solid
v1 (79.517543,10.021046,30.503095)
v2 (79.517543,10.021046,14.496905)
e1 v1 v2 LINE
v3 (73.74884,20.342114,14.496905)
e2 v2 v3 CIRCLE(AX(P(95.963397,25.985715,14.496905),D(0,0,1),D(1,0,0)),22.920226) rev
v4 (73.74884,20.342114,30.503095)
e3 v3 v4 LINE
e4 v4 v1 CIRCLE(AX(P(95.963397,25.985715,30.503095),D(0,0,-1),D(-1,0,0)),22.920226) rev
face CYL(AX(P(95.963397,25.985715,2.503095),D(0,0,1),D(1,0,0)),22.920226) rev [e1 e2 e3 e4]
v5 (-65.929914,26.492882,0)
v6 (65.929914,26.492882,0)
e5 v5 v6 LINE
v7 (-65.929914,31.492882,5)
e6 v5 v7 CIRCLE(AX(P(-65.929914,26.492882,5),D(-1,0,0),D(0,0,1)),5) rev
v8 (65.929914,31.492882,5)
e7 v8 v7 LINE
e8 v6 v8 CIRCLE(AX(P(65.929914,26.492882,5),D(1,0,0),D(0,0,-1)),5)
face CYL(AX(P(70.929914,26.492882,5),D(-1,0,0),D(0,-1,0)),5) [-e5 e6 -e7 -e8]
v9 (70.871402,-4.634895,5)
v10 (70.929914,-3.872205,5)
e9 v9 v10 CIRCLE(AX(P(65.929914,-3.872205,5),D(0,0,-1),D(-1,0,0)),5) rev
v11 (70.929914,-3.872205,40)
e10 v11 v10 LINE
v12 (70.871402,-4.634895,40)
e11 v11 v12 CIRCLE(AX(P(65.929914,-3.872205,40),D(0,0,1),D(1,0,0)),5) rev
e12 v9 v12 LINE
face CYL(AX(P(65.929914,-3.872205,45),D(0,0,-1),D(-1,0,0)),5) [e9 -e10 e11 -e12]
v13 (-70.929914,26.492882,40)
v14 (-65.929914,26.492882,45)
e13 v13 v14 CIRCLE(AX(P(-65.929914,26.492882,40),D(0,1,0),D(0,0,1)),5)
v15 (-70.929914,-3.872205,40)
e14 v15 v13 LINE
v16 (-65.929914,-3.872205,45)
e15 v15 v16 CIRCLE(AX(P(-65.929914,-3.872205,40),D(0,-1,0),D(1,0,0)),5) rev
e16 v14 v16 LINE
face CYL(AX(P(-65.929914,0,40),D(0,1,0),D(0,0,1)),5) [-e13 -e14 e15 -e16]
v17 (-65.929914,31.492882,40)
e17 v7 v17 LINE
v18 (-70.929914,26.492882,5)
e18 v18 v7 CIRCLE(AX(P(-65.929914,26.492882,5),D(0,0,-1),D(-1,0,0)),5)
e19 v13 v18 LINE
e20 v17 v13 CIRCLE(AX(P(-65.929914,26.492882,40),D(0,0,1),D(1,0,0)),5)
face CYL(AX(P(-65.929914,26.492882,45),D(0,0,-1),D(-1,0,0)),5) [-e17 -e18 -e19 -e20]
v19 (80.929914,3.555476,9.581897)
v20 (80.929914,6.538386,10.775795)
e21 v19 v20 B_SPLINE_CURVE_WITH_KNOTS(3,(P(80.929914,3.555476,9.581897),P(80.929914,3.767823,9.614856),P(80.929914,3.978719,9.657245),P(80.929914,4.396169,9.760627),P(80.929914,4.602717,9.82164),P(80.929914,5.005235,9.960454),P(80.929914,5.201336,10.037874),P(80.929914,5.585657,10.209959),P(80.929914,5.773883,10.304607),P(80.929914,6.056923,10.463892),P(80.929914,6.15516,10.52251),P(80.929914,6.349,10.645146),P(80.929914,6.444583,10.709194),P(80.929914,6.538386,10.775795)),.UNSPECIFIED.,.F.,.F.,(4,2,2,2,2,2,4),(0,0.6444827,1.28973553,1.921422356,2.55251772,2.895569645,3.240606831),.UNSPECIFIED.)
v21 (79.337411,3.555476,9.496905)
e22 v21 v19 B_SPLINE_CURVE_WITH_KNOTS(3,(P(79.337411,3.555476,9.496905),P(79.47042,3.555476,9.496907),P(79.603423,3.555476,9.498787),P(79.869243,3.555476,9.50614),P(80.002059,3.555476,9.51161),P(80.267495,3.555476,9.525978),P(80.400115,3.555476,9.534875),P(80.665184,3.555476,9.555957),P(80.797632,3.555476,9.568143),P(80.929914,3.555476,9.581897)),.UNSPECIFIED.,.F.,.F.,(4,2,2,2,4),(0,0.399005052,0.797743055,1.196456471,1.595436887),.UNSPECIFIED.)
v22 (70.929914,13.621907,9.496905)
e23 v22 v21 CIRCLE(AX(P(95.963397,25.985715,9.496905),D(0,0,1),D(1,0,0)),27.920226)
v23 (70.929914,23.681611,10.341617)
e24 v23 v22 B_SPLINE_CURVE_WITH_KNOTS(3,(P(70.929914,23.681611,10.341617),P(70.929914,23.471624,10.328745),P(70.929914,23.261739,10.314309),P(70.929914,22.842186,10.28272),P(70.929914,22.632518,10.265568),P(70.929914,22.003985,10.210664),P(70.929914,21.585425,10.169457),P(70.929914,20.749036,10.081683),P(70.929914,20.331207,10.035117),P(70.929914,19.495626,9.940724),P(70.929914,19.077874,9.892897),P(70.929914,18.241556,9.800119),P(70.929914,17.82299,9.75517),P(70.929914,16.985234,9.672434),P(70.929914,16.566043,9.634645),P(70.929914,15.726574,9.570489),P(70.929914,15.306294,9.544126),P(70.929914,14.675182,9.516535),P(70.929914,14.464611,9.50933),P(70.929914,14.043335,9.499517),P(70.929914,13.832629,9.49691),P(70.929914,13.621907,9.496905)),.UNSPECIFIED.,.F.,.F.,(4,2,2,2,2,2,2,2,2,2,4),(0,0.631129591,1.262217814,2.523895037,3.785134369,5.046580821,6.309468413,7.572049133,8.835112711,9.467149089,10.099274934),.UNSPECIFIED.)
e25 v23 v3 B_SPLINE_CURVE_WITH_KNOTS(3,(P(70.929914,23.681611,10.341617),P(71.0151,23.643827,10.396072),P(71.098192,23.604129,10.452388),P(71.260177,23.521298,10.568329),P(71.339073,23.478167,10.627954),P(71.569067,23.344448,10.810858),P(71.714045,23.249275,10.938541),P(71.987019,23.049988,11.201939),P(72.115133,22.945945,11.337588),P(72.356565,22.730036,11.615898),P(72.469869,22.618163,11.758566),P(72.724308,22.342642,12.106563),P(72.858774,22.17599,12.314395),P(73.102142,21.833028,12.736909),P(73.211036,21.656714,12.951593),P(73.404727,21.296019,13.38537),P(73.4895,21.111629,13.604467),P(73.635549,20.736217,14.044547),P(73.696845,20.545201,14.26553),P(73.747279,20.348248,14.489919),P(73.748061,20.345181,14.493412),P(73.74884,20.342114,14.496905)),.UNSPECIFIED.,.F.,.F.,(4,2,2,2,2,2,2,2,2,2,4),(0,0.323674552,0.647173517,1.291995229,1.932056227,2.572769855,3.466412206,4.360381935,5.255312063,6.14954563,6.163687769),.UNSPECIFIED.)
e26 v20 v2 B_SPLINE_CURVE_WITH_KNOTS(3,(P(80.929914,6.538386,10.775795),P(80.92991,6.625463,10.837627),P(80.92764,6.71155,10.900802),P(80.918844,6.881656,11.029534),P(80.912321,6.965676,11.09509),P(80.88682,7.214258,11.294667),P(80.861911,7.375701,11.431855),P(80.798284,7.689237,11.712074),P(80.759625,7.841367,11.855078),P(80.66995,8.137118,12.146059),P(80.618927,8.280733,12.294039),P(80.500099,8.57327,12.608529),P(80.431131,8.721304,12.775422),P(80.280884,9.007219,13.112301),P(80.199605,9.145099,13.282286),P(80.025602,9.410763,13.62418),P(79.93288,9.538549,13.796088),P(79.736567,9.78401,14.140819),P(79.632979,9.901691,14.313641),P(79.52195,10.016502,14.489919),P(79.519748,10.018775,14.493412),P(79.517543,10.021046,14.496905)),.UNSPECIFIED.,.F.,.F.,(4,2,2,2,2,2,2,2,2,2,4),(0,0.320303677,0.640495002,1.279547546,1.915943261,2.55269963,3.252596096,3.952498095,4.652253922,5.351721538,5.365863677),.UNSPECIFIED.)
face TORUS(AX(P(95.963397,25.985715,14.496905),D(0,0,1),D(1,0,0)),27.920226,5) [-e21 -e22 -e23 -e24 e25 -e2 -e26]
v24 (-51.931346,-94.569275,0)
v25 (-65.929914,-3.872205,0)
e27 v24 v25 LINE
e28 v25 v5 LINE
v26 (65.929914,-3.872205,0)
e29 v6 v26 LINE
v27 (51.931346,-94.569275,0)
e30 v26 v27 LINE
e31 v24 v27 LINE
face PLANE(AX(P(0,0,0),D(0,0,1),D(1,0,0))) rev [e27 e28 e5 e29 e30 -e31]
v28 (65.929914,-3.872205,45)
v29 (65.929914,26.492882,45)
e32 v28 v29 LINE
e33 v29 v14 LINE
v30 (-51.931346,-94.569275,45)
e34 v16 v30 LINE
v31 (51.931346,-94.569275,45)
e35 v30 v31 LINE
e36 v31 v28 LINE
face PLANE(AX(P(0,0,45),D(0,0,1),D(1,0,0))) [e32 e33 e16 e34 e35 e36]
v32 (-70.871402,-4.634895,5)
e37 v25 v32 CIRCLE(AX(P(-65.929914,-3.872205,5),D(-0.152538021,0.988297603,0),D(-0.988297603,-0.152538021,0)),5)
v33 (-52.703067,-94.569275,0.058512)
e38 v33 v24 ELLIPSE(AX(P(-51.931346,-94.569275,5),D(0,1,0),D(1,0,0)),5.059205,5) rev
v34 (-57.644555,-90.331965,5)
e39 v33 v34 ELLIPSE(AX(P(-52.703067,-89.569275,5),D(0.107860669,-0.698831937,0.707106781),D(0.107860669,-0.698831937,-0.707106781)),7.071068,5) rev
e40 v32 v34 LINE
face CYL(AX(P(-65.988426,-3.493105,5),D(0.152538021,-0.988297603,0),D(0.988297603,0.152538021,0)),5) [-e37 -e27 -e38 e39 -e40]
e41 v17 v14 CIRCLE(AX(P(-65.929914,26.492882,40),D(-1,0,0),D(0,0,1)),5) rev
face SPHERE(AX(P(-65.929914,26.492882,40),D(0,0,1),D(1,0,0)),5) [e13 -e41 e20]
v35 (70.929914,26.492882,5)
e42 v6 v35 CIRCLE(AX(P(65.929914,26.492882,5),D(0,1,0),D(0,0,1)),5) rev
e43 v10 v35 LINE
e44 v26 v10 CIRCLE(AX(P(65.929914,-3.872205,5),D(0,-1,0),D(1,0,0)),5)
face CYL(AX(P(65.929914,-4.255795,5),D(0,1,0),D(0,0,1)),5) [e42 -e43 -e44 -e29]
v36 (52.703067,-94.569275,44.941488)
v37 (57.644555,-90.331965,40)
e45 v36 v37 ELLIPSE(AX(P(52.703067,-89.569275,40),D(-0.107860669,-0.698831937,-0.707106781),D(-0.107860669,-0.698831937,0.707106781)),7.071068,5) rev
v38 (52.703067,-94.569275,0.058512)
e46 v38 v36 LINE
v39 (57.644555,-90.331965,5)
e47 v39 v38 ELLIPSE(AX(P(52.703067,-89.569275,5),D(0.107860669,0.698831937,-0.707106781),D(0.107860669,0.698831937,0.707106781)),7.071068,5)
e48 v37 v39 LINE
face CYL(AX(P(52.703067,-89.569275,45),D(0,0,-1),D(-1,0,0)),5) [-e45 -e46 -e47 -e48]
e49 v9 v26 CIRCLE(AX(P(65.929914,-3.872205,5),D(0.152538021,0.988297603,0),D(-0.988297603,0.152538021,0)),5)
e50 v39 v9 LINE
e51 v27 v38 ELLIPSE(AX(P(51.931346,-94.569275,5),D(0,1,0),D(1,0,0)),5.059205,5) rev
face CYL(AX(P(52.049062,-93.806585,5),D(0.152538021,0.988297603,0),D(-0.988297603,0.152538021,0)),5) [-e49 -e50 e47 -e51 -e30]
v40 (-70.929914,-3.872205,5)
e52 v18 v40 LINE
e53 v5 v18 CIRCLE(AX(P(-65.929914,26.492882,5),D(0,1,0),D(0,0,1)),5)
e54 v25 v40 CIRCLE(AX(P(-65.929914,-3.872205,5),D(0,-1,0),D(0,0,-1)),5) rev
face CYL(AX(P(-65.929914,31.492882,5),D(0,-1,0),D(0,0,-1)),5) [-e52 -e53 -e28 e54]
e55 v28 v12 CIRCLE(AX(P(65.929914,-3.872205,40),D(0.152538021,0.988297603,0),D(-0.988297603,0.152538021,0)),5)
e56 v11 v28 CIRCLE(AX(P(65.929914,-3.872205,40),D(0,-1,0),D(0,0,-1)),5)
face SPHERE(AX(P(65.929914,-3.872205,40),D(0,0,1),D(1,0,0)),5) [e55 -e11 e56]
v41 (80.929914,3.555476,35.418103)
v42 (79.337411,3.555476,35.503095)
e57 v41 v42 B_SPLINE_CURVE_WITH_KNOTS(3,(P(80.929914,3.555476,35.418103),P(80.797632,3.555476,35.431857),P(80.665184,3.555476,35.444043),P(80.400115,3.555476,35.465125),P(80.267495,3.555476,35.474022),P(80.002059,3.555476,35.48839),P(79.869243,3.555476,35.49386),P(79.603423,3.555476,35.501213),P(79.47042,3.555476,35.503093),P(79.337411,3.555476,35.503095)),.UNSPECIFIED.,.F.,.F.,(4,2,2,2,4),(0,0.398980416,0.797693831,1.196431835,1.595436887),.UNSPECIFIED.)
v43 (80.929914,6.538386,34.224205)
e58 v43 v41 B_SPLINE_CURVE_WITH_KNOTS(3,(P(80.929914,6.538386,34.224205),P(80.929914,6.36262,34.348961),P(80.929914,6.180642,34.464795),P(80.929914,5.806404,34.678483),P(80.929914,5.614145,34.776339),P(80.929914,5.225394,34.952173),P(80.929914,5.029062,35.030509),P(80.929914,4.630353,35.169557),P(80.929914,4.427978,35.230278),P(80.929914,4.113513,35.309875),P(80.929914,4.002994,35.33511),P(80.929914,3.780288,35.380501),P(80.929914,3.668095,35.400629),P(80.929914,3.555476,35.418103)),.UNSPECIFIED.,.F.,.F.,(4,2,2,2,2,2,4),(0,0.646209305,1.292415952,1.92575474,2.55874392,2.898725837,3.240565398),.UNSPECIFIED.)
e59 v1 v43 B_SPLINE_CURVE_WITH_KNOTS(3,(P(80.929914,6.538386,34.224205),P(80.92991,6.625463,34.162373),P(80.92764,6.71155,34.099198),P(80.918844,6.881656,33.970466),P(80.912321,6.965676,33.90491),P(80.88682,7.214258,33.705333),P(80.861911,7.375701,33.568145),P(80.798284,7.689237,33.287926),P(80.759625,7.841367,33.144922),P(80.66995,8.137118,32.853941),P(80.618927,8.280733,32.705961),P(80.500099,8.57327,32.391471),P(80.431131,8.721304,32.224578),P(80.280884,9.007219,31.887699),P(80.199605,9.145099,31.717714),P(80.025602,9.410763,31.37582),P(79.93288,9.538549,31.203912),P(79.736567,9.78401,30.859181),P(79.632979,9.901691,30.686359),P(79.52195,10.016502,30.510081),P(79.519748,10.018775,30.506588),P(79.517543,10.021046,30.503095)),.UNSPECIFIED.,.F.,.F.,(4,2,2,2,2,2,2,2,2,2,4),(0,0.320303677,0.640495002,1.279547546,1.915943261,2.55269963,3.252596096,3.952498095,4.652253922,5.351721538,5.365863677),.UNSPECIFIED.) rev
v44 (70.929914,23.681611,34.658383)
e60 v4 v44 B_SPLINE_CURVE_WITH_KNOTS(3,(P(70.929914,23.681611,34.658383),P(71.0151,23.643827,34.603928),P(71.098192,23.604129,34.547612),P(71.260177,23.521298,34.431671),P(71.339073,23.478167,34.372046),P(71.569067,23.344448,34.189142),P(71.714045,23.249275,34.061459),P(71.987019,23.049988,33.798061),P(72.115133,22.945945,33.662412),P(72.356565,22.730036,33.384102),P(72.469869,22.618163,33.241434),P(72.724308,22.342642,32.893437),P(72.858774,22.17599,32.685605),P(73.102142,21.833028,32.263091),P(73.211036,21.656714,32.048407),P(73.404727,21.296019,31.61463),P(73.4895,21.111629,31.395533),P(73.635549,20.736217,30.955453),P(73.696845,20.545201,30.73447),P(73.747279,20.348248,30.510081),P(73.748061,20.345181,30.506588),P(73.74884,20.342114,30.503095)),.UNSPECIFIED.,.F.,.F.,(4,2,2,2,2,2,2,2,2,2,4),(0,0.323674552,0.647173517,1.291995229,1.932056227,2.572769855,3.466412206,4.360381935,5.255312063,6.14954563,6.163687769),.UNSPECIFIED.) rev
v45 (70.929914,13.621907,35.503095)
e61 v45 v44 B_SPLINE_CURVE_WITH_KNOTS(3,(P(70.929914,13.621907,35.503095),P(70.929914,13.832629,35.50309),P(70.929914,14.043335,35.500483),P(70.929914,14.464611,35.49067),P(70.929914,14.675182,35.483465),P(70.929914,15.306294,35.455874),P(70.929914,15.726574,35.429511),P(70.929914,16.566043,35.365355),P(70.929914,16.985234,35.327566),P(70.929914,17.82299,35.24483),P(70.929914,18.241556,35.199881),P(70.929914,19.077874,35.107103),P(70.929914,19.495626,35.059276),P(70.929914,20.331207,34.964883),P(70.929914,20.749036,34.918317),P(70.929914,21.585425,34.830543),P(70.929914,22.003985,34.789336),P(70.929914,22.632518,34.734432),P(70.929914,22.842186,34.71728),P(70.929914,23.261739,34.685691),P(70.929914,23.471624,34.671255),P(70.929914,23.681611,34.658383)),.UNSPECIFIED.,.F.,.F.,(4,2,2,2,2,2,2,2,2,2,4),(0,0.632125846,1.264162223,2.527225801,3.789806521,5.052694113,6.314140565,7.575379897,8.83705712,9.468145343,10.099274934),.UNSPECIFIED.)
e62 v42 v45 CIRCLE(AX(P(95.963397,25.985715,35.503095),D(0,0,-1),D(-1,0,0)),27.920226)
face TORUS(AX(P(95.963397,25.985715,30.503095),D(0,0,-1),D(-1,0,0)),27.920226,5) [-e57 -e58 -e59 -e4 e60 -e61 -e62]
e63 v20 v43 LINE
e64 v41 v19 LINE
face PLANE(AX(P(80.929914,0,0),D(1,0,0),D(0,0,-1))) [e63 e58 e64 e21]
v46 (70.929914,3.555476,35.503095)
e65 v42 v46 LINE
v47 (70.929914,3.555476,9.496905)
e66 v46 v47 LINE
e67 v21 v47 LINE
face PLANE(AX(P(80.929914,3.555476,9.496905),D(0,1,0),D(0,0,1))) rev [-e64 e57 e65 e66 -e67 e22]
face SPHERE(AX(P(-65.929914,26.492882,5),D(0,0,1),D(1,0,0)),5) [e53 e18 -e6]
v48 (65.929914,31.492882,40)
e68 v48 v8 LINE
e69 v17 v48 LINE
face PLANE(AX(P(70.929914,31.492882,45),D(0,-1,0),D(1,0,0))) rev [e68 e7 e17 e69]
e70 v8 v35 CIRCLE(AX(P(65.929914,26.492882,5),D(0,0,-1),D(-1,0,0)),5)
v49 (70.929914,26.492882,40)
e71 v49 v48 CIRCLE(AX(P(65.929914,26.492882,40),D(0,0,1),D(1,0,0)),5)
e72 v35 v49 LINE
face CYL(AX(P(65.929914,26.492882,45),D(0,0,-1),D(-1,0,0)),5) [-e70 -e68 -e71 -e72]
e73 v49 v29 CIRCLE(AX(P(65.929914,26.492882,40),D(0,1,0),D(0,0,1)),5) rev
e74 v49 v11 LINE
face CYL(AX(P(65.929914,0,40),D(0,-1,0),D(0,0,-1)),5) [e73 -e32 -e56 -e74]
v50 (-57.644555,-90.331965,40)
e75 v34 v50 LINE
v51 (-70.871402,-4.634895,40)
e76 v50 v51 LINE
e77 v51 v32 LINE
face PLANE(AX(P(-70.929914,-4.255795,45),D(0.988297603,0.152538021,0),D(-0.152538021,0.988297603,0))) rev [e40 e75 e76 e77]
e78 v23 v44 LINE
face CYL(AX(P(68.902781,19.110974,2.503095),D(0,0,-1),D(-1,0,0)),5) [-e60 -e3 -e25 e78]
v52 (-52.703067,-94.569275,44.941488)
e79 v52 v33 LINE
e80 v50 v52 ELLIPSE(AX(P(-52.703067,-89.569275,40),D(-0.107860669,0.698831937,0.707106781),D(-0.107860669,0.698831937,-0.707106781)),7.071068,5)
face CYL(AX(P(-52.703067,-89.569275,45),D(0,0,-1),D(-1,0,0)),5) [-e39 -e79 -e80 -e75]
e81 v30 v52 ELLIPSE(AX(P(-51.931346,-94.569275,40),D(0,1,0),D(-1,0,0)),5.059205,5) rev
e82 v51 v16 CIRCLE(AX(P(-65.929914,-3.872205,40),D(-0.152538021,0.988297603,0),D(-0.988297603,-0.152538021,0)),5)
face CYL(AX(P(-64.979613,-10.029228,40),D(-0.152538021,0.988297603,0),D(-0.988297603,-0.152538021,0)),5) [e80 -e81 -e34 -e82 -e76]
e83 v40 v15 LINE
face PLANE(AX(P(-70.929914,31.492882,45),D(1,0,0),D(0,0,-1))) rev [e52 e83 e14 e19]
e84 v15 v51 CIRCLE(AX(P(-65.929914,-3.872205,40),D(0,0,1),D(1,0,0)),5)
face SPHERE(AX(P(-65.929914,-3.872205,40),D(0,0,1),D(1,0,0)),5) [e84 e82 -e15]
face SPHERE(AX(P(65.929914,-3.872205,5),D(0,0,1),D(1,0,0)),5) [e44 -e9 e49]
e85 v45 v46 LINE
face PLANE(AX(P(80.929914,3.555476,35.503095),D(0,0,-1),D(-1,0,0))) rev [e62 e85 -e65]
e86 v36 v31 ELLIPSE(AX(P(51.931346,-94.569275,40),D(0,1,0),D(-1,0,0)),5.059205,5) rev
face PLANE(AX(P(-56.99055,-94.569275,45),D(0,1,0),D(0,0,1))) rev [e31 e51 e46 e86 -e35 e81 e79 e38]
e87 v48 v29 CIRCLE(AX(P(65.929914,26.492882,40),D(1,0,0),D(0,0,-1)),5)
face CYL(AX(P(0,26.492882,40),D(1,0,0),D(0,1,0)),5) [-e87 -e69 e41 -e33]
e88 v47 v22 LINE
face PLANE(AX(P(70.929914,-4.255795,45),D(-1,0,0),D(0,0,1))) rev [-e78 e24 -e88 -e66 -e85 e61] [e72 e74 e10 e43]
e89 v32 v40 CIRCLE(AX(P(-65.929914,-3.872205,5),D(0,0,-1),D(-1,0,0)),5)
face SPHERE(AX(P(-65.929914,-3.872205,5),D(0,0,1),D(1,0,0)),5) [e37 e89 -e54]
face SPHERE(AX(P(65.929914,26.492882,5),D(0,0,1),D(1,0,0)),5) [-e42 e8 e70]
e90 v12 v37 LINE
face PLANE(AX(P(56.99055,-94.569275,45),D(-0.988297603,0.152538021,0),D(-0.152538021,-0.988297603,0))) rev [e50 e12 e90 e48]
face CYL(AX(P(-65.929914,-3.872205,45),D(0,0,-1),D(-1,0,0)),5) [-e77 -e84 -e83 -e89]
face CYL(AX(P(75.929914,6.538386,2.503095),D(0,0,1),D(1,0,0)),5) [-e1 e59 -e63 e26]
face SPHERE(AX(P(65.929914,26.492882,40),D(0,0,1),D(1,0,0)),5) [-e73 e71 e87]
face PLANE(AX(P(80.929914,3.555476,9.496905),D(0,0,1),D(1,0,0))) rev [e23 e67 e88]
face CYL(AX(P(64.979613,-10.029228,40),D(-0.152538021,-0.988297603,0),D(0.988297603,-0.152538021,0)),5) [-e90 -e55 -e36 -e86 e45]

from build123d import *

# Parameters (mm, degrees)
BOSS_EXTRUDE1_DEPTH = 45
SKETCH2_W           = 26.006189056
SKETCH2_H           = 20.126135809
BOSS_EXTRUDE2_DEPTH = 10
SKETCH3_R           = 22.920226204
CUT_EXTRUDE1_DEPTH  = 33
FILLET1_R           = 5
FILLET2_R           = 5


with BuildPart() as part:
    # Sketch1 → Boss-Extrude1 (new body)
    with BuildSketch(Plane.XY):
        Polygon((-70.929913968, 31.492881802), (-70.929913968, -4.255794838), (-56.990550477, -94.56927522), (56.990550477, -94.56927522), (70.929913968, -4.255794838), (70.929913968, 31.492881802), align=None)
    extrude(amount=BOSS_EXTRUDE1_DEPTH)

    # Sketch2 → Boss-Extrude2 (add)
    with BuildSketch(Plane(origin=(70.929913968, 0, 0), x_dir=(0, 0, -1), z_dir=(1, 0, 0))):
        with Locations((-22.5, 13.618543481)):
            Rectangle(SKETCH2_W, SKETCH2_H)
    extrude(amount=BOSS_EXTRUDE2_DEPTH)

    # Sketch3 → Cut-Extrude1 (cut)
    with BuildSketch(Plane.XY.offset(35.503094528)):
        with Locations((95.963397028, 25.985714872)):
            Circle(SKETCH3_R)
    extrude(amount=-CUT_EXTRUDE1_DEPTH, mode=Mode.SUBTRACT)

    # Fillet1
    fillet1_edges = [part.edges().sort_by_distance(p)[0] for p in [
        (-63.960232222, -49.412535029, 45),
        (70.929913968, 31.492881802, 22.5),
        (70.929913968, -4.255794838, 22.5),
        (56.990550477, -94.56927522, 22.5),
        (-56.990550477, -94.56927522, 22.5),
        (-70.929913968, -4.255794838, 22.5),
        (-70.929913968, 31.492881802, 22.5),
        (63.960232222, -49.412535029, 45),
        (70.929913968, 13.618543482, 45),
        (0, 31.492881802, 45),
        (70.929913968, 13.618543482, 0),
        (63.960232222, -49.412535029, 0),
        (-70.929913968, 13.618543482, 45),
        (-63.960232222, -49.412535029, 0),
        (-70.929913968, 13.618543482, 0),
        (0, 31.492881802, 0),
    ]]
    fillet(fillet1_edges, radius=FILLET1_R)

    # Fillet2
    # the kernel refuses this fillet: 5 mm, written as the material it takes off along each edge
    with BuildSketch(Plane(origin=(80.929913968, 8.684525424, 4.131557715), x_dir=(0, -1, 0), z_dir=(0, 0, 1))) as fillet2_piece_1:
        with BuildLine():
            CenterArc((2.146139103, -5), FILLET2_R, 90, 44.149416871)
            ThreePointArc((-1.336520459, -1.412370925), (-0.653275696, -0.720365262), (0, 0))
            Line((0, 0), (2.146139103, 0))
        make_face()
    extrude(amount=36.736884569, mode=Mode.SUBTRACT)
    with BuildSketch(Plane(origin=(73.159277304, 23.681611386, 1.019055512), x_dir=(-1, 0, 0), z_dir=(0, 0, 1))) as fillet2_piece_2:
        with BuildLine():
            CenterArc((4.256496735, 4.570637831), FILLET2_R, 194.254416025, 51.827716126)
            ThreePointArc((-0.589562939, 3.339497856), (-0.232935215, 1.680667414), (0, 0))
            Line((0, 0), (2.229363336, 0))
        make_face()
    extrude(amount=42.961888977, mode=Mode.SUBTRACT)
    with BuildSketch(Plane(origin=(95.963397028, 25.985714872, 9.496905472), x_dir=(-0.9027297705617247, 0.43020804425484166, 0), z_dir=(0.43020804425484166, 0.9027297705617247, 0))) as fillet2_piece_3_section:
        with BuildLine():
            CenterArc((22.920226204 + FILLET2_R, FILLET2_R), FILLET2_R, 180, 90)
            Line((22.920226204, FILLET2_R), (22.920226204, 0))
            Line((22.920226204, 0), (22.920226204 + FILLET2_R, 0))
        make_face()
    fillet2_piece_3 = revolve(axis=Axis((95.963397028, 25.985714872, 9.496905472), (0, 0, 1)), revolution_arc=105.742769493, mode=Mode.PRIVATE)
    fillet2_piece_3 = split(fillet2_piece_3, bisect_by=Plane(origin=(70.929913968, 25.985714872, 9.496905472), z_dir=(1, 0, 0)), keep=Keep.TOP, mode=Mode.PRIVATE)
    add(fillet2_piece_3, mode=Mode.SUBTRACT)
    with BuildSketch(Plane(origin=(95.963397028, 25.985714872, 35.503094528), x_dir=(-0.9027297705617229, 0.4302080442548457, 0), z_dir=(0.4302080442548457, 0.9027297705617229, 0))) as fillet2_piece_4_section:
        with BuildLine():
            CenterArc((22.920226204 + FILLET2_R, -FILLET2_R), FILLET2_R, 90, 90)
            Line((22.920226204, -FILLET2_R), (22.920226204, 0))
            Line((22.920226204, 0), (22.920226204 + FILLET2_R, 0))
        make_face()
    fillet2_piece_4 = revolve(axis=Axis((95.963397028, 25.985714872, 35.503094528), (0, 0, 1)), revolution_arc=105.742769493, mode=Mode.PRIVATE)
    fillet2_piece_4 = split(fillet2_piece_4, bisect_by=Plane(origin=(70.929913968, 25.985714872, 35.503094528), z_dir=(1, 0, 0)), keep=Keep.TOP, mode=Mode.PRIVATE)
    add(fillet2_piece_4, mode=Mode.SUBTRACT)


solid = part.part
